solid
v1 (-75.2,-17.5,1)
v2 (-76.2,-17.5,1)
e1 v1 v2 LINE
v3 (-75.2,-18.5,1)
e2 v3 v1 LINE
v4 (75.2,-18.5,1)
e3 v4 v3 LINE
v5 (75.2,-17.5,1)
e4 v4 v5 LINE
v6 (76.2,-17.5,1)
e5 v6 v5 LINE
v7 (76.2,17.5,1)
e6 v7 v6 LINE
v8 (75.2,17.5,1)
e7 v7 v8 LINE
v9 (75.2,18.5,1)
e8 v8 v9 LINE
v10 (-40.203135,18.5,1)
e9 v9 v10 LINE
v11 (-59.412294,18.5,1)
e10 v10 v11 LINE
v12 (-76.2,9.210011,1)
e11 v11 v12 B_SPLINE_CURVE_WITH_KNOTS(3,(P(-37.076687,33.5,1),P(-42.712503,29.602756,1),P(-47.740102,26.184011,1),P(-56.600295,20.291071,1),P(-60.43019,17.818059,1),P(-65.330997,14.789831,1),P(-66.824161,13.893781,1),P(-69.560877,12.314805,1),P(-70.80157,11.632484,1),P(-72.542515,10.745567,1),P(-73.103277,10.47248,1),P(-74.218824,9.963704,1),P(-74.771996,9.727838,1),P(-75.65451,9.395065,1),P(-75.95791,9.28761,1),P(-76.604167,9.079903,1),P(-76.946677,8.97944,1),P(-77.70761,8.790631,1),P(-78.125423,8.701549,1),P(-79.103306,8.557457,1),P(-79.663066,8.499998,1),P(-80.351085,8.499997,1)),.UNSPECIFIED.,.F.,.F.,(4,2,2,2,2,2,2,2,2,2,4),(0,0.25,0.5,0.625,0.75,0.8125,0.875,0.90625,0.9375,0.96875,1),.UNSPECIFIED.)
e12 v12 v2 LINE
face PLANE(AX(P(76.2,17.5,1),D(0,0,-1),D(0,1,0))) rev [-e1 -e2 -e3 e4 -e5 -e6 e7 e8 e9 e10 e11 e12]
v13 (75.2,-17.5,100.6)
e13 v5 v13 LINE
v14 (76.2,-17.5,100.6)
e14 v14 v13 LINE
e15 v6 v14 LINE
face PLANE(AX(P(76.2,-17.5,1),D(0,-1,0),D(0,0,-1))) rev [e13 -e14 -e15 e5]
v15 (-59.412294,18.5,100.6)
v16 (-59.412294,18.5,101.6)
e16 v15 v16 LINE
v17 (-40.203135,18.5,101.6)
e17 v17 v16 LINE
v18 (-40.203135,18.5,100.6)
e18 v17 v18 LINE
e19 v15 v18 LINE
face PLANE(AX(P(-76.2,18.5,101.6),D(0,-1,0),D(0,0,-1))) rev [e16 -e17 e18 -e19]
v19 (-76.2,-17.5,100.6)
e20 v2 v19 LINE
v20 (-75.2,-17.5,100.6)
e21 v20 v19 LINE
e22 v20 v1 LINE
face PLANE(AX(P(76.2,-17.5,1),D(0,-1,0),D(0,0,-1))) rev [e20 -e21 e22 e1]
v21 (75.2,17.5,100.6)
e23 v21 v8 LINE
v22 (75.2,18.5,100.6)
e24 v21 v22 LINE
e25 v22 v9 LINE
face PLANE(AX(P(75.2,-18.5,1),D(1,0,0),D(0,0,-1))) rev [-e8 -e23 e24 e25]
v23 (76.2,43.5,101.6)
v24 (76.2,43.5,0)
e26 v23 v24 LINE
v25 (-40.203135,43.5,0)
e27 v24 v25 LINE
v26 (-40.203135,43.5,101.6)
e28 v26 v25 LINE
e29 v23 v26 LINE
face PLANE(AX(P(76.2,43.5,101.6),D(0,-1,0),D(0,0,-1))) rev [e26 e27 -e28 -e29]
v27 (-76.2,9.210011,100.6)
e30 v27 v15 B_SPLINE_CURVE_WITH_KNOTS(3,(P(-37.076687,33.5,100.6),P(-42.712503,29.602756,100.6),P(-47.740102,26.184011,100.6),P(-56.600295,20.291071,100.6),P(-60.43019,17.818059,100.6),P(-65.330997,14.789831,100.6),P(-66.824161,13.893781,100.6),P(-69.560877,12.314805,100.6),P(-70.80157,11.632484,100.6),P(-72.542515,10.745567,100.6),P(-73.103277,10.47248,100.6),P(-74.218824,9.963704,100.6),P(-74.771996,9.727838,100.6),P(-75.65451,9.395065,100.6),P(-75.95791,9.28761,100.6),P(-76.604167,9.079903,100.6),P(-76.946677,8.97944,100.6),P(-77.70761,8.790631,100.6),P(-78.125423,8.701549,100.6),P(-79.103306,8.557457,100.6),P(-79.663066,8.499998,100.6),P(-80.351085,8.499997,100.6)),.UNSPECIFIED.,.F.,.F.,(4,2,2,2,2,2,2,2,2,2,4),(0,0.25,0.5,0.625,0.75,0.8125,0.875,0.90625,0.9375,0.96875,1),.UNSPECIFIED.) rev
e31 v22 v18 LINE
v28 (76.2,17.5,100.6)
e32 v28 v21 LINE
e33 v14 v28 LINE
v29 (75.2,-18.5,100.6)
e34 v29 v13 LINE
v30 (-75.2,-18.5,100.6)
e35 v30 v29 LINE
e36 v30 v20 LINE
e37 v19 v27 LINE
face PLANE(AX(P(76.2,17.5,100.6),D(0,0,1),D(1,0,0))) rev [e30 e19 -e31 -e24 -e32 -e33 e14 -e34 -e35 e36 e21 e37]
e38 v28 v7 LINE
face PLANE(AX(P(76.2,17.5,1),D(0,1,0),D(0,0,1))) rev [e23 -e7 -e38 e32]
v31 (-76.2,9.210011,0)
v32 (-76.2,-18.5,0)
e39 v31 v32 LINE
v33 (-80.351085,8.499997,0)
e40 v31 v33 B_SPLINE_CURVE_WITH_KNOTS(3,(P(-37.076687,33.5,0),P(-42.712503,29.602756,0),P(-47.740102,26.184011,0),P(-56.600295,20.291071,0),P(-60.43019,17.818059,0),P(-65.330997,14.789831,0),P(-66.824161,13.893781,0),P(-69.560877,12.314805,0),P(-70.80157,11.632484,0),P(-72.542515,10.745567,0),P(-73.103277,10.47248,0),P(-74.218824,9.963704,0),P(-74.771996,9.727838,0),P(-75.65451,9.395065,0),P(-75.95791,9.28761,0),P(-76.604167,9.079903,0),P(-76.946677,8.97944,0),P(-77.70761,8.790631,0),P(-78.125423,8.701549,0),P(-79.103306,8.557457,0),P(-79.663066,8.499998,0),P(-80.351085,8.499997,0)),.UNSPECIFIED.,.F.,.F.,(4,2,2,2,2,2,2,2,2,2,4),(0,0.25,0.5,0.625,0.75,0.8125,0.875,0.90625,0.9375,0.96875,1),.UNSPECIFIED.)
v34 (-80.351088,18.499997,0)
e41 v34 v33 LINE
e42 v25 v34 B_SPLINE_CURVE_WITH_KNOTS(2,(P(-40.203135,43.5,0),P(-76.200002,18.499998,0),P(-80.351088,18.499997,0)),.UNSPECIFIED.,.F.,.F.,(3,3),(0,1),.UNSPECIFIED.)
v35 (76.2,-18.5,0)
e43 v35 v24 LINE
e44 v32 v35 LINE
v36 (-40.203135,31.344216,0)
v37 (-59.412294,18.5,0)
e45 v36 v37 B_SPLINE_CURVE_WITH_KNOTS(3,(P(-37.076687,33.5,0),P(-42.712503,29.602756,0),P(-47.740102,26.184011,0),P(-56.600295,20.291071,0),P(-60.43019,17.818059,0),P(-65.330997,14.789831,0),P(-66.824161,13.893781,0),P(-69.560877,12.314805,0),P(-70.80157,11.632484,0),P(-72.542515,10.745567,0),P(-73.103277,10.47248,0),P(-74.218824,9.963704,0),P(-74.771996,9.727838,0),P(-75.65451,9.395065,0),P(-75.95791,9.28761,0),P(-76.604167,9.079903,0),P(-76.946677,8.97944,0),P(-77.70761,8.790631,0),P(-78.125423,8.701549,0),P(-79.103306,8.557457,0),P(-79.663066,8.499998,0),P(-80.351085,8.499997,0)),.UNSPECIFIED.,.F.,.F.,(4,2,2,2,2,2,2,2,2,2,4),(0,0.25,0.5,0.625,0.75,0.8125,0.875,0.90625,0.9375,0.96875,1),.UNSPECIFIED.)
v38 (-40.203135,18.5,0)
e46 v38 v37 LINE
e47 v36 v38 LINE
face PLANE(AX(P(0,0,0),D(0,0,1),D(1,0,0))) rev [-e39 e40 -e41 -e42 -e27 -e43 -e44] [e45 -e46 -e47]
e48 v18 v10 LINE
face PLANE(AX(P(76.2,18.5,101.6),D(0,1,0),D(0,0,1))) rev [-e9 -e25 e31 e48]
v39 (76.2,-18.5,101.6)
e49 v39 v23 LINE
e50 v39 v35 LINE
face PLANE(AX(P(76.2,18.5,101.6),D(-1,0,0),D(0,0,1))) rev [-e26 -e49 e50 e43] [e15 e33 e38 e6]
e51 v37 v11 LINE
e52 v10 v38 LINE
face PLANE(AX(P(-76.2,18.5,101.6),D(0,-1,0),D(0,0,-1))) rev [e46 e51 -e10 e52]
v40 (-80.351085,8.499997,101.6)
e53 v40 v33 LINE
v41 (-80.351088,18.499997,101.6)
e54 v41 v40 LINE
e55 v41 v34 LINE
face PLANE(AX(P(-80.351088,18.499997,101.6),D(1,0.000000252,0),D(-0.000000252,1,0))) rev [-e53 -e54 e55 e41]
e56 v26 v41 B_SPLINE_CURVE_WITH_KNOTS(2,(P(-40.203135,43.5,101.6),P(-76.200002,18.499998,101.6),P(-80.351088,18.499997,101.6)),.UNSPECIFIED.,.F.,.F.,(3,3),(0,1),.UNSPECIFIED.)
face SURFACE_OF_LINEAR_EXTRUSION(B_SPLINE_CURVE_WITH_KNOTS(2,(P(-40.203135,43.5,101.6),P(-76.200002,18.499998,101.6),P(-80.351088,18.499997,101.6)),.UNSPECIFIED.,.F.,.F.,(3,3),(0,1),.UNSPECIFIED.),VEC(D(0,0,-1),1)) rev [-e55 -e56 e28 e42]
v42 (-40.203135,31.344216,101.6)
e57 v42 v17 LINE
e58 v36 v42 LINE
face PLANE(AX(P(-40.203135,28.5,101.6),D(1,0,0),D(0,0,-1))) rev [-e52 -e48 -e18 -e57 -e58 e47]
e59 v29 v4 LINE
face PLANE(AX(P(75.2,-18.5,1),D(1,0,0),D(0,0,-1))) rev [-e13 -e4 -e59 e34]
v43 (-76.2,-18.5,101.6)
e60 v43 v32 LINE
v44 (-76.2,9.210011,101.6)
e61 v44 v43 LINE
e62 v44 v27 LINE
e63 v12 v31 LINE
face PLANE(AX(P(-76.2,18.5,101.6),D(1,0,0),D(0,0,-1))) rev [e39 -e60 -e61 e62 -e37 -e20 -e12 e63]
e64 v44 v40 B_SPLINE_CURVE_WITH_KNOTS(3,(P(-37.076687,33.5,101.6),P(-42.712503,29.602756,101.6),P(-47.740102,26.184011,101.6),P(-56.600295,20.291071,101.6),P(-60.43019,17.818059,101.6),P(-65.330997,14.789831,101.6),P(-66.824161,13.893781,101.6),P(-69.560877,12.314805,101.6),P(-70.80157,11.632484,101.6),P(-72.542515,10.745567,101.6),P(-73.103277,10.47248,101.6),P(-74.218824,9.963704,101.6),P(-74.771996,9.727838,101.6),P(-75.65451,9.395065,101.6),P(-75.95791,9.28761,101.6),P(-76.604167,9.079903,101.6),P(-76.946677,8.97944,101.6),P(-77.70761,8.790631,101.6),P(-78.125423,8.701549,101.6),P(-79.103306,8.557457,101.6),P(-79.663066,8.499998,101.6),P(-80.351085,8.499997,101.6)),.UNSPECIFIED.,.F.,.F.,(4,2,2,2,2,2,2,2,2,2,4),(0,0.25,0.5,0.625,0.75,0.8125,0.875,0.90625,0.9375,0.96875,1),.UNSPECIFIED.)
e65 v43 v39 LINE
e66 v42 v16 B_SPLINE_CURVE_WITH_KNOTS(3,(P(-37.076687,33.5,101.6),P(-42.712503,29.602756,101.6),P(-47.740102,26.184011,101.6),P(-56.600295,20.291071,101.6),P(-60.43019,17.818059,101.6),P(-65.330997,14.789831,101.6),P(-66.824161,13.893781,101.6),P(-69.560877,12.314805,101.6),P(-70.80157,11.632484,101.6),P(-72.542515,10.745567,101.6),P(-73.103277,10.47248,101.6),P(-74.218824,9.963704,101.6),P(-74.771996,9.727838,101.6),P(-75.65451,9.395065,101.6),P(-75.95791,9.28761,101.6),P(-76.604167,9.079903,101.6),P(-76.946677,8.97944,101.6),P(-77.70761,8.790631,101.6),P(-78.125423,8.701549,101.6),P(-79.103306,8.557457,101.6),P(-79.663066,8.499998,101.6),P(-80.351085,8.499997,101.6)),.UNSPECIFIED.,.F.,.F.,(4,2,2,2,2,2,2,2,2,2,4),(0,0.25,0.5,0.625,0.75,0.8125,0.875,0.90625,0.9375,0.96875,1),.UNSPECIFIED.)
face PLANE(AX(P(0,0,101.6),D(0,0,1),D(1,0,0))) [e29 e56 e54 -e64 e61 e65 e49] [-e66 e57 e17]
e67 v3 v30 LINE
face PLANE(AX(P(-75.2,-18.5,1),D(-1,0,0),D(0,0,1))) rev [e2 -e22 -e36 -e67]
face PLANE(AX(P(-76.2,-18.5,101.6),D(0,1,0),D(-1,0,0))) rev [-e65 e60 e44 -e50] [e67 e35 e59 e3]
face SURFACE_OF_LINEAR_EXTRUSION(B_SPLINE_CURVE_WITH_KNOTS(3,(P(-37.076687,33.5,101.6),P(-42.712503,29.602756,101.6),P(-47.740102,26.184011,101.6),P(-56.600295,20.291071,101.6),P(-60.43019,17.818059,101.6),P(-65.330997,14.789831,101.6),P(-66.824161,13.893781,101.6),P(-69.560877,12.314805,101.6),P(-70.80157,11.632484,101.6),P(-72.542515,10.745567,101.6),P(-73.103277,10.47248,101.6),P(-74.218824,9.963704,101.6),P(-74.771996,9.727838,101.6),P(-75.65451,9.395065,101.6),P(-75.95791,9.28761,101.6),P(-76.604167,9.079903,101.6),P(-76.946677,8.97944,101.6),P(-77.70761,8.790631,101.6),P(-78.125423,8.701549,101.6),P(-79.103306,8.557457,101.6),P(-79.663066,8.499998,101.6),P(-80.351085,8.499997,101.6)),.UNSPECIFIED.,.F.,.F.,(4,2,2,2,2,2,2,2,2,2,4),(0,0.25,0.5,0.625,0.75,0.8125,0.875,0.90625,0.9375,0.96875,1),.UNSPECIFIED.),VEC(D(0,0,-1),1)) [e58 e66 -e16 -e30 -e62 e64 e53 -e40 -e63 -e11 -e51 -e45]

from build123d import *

# Parameters (mm, degrees)
SKETCH1_W           = 152.4
SKETCH1_H           = 37
BOSS_EXTRUDE1_DEPTH = 101.6
SKETCH2_W           = 99.6
SKETCH2_H           = 35
CUT_EXTRUDE1_DEPTH  = 185.093916249
SKETCH3_W           = 150.4
SKETCH3_H           = 99.6
CUT_EXTRUDE2_DEPTH  = 133.280006048
EXTRUDE_THIN4_START = -101.6
EXTRUDE_THIN4_DEPTH = 101.6
SKETCH9_W           = 106.403135183
SKETCH9_H           = 5
BOSS_EXTRUDE4_DEPTH = 101.6


# Read off the part's stored shape, not the designer's step: Extrude-Thin4
with BuildPart() as part:
    # Sketch1 → Boss-Extrude1 (new body)
    with BuildSketch(Plane.XY):
        Rectangle(SKETCH1_W, SKETCH1_H)
    extrude(amount=BOSS_EXTRUDE1_DEPTH)

    # Sketch2 → Cut-Extrude1 (cut, through all)
    with BuildSketch(Plane.ZY.offset(76.2)):
        with Locations((50.8, 0)):
            Rectangle(SKETCH2_W, SKETCH2_H)
    extrude(amount=-CUT_EXTRUDE1_DEPTH, mode=Mode.SUBTRACT)

    # Sketch3 → Cut-Extrude2 (cut, through all)
    with BuildSketch(Plane(origin=(0, 18.5, 0), x_dir=(1, 0, 0), z_dir=(0, 1, 0))):
        with Locations((0, -50.8)):
            Rectangle(SKETCH3_W, SKETCH3_H)
    extrude(amount=-CUT_EXTRUDE2_DEPTH, mode=Mode.SUBTRACT)

    # Extrude-Thin4 outline → Extrude-Thin4 (add)
    with BuildSketch(Plane(origin=(0, 0, 0), x_dir=(-1, 0, 0), z_dir=(0, 0, -1)).offset(EXTRUDE_THIN4_START)):
        with BuildLine():
            Line((-76.2, 43.5), (-76.2, 18.5))
            Line((-76.2, 18.5), (40.203135183, 18.5))
            Line((40.203135183, 18.5), (40.203135183, 28.5))
            Line((40.203135183, 28.5), (-66.2, 28.5))
            Line((-66.2, 28.5), (-66.2, 33.5))
            Line((-66.2, 33.5), (37.076687279, 33.5))
            add(Edge.make_bspline(
                [(37.076687279, 33.5), (42.712503235, 29.602755941), (47.740101517, 26.184011055), (56.600294641, 20.291071098), (60.430190038, 17.818058565), (65.330997145, 14.789830611), (66.824161054, 13.89378122), (69.560877297, 12.31480535), (70.801570346, 11.632483882), (72.54251455, 10.745567395), (73.103276521, 10.472479574), (74.21882377, 9.963704392), (74.771996239, 9.727837773), (75.629792754, 9.404385606), (75.906990567, 9.305691485), (76.2, 9.210010654)],
                knots=[0, 0, 0, 0, 0.25, 0.25, 0.5, 0.5, 0.625, 0.625, 0.75, 0.75, 0.8125, 0.8125, 0.875, 0.875, 0.903624295, 0.903624295, 0.903624295, 0.903624295], degree=3))
            add(Edge.make_bspline(
                [(76.2, 9.210010654), (76.22687774, 9.201233856), (76.253888525, 9.192482414), (76.604166758, 9.079903255), (76.946677128, 8.979439764), (77.707610171, 8.79063089), (78.125422966, 8.701549246), (79.103306411, 8.557457163), (79.663066468, 8.499997568), (80.351085446, 8.499997395)],
                knots=[0.903624295, 0.903624295, 0.903624295, 0.903624295, 0.90625, 0.90625, 0.9375, 0.9375, 0.96875, 0.96875, 1, 1, 1, 1], degree=3))
            Line((80.351085446, 8.499997395), (80.351087966, 18.499997395))
            add(Edge.make_bspline(
                [(40.203135183, 43.5), (76.200002245, 18.499998441), (80.351087966, 18.499997395)],
                knots=[0, 0, 0, 1, 1, 1], degree=2))
            Line((40.203135183, 43.5), (-76.2, 43.5))
        make_face()
    extrude(amount=EXTRUDE_THIN4_DEPTH)

    # Sketch9 → Boss-Extrude4 (add)
    with BuildSketch(Plane(origin=(0, 0, 0), x_dir=(-1, 0, 0), z_dir=(0, 0, -1))):
        with Locations((-12.998432409, 31)):
            Rectangle(SKETCH9_W, SKETCH9_H)
    extrude(amount=-BOSS_EXTRUDE4_DEPTH)


solid = part.part
